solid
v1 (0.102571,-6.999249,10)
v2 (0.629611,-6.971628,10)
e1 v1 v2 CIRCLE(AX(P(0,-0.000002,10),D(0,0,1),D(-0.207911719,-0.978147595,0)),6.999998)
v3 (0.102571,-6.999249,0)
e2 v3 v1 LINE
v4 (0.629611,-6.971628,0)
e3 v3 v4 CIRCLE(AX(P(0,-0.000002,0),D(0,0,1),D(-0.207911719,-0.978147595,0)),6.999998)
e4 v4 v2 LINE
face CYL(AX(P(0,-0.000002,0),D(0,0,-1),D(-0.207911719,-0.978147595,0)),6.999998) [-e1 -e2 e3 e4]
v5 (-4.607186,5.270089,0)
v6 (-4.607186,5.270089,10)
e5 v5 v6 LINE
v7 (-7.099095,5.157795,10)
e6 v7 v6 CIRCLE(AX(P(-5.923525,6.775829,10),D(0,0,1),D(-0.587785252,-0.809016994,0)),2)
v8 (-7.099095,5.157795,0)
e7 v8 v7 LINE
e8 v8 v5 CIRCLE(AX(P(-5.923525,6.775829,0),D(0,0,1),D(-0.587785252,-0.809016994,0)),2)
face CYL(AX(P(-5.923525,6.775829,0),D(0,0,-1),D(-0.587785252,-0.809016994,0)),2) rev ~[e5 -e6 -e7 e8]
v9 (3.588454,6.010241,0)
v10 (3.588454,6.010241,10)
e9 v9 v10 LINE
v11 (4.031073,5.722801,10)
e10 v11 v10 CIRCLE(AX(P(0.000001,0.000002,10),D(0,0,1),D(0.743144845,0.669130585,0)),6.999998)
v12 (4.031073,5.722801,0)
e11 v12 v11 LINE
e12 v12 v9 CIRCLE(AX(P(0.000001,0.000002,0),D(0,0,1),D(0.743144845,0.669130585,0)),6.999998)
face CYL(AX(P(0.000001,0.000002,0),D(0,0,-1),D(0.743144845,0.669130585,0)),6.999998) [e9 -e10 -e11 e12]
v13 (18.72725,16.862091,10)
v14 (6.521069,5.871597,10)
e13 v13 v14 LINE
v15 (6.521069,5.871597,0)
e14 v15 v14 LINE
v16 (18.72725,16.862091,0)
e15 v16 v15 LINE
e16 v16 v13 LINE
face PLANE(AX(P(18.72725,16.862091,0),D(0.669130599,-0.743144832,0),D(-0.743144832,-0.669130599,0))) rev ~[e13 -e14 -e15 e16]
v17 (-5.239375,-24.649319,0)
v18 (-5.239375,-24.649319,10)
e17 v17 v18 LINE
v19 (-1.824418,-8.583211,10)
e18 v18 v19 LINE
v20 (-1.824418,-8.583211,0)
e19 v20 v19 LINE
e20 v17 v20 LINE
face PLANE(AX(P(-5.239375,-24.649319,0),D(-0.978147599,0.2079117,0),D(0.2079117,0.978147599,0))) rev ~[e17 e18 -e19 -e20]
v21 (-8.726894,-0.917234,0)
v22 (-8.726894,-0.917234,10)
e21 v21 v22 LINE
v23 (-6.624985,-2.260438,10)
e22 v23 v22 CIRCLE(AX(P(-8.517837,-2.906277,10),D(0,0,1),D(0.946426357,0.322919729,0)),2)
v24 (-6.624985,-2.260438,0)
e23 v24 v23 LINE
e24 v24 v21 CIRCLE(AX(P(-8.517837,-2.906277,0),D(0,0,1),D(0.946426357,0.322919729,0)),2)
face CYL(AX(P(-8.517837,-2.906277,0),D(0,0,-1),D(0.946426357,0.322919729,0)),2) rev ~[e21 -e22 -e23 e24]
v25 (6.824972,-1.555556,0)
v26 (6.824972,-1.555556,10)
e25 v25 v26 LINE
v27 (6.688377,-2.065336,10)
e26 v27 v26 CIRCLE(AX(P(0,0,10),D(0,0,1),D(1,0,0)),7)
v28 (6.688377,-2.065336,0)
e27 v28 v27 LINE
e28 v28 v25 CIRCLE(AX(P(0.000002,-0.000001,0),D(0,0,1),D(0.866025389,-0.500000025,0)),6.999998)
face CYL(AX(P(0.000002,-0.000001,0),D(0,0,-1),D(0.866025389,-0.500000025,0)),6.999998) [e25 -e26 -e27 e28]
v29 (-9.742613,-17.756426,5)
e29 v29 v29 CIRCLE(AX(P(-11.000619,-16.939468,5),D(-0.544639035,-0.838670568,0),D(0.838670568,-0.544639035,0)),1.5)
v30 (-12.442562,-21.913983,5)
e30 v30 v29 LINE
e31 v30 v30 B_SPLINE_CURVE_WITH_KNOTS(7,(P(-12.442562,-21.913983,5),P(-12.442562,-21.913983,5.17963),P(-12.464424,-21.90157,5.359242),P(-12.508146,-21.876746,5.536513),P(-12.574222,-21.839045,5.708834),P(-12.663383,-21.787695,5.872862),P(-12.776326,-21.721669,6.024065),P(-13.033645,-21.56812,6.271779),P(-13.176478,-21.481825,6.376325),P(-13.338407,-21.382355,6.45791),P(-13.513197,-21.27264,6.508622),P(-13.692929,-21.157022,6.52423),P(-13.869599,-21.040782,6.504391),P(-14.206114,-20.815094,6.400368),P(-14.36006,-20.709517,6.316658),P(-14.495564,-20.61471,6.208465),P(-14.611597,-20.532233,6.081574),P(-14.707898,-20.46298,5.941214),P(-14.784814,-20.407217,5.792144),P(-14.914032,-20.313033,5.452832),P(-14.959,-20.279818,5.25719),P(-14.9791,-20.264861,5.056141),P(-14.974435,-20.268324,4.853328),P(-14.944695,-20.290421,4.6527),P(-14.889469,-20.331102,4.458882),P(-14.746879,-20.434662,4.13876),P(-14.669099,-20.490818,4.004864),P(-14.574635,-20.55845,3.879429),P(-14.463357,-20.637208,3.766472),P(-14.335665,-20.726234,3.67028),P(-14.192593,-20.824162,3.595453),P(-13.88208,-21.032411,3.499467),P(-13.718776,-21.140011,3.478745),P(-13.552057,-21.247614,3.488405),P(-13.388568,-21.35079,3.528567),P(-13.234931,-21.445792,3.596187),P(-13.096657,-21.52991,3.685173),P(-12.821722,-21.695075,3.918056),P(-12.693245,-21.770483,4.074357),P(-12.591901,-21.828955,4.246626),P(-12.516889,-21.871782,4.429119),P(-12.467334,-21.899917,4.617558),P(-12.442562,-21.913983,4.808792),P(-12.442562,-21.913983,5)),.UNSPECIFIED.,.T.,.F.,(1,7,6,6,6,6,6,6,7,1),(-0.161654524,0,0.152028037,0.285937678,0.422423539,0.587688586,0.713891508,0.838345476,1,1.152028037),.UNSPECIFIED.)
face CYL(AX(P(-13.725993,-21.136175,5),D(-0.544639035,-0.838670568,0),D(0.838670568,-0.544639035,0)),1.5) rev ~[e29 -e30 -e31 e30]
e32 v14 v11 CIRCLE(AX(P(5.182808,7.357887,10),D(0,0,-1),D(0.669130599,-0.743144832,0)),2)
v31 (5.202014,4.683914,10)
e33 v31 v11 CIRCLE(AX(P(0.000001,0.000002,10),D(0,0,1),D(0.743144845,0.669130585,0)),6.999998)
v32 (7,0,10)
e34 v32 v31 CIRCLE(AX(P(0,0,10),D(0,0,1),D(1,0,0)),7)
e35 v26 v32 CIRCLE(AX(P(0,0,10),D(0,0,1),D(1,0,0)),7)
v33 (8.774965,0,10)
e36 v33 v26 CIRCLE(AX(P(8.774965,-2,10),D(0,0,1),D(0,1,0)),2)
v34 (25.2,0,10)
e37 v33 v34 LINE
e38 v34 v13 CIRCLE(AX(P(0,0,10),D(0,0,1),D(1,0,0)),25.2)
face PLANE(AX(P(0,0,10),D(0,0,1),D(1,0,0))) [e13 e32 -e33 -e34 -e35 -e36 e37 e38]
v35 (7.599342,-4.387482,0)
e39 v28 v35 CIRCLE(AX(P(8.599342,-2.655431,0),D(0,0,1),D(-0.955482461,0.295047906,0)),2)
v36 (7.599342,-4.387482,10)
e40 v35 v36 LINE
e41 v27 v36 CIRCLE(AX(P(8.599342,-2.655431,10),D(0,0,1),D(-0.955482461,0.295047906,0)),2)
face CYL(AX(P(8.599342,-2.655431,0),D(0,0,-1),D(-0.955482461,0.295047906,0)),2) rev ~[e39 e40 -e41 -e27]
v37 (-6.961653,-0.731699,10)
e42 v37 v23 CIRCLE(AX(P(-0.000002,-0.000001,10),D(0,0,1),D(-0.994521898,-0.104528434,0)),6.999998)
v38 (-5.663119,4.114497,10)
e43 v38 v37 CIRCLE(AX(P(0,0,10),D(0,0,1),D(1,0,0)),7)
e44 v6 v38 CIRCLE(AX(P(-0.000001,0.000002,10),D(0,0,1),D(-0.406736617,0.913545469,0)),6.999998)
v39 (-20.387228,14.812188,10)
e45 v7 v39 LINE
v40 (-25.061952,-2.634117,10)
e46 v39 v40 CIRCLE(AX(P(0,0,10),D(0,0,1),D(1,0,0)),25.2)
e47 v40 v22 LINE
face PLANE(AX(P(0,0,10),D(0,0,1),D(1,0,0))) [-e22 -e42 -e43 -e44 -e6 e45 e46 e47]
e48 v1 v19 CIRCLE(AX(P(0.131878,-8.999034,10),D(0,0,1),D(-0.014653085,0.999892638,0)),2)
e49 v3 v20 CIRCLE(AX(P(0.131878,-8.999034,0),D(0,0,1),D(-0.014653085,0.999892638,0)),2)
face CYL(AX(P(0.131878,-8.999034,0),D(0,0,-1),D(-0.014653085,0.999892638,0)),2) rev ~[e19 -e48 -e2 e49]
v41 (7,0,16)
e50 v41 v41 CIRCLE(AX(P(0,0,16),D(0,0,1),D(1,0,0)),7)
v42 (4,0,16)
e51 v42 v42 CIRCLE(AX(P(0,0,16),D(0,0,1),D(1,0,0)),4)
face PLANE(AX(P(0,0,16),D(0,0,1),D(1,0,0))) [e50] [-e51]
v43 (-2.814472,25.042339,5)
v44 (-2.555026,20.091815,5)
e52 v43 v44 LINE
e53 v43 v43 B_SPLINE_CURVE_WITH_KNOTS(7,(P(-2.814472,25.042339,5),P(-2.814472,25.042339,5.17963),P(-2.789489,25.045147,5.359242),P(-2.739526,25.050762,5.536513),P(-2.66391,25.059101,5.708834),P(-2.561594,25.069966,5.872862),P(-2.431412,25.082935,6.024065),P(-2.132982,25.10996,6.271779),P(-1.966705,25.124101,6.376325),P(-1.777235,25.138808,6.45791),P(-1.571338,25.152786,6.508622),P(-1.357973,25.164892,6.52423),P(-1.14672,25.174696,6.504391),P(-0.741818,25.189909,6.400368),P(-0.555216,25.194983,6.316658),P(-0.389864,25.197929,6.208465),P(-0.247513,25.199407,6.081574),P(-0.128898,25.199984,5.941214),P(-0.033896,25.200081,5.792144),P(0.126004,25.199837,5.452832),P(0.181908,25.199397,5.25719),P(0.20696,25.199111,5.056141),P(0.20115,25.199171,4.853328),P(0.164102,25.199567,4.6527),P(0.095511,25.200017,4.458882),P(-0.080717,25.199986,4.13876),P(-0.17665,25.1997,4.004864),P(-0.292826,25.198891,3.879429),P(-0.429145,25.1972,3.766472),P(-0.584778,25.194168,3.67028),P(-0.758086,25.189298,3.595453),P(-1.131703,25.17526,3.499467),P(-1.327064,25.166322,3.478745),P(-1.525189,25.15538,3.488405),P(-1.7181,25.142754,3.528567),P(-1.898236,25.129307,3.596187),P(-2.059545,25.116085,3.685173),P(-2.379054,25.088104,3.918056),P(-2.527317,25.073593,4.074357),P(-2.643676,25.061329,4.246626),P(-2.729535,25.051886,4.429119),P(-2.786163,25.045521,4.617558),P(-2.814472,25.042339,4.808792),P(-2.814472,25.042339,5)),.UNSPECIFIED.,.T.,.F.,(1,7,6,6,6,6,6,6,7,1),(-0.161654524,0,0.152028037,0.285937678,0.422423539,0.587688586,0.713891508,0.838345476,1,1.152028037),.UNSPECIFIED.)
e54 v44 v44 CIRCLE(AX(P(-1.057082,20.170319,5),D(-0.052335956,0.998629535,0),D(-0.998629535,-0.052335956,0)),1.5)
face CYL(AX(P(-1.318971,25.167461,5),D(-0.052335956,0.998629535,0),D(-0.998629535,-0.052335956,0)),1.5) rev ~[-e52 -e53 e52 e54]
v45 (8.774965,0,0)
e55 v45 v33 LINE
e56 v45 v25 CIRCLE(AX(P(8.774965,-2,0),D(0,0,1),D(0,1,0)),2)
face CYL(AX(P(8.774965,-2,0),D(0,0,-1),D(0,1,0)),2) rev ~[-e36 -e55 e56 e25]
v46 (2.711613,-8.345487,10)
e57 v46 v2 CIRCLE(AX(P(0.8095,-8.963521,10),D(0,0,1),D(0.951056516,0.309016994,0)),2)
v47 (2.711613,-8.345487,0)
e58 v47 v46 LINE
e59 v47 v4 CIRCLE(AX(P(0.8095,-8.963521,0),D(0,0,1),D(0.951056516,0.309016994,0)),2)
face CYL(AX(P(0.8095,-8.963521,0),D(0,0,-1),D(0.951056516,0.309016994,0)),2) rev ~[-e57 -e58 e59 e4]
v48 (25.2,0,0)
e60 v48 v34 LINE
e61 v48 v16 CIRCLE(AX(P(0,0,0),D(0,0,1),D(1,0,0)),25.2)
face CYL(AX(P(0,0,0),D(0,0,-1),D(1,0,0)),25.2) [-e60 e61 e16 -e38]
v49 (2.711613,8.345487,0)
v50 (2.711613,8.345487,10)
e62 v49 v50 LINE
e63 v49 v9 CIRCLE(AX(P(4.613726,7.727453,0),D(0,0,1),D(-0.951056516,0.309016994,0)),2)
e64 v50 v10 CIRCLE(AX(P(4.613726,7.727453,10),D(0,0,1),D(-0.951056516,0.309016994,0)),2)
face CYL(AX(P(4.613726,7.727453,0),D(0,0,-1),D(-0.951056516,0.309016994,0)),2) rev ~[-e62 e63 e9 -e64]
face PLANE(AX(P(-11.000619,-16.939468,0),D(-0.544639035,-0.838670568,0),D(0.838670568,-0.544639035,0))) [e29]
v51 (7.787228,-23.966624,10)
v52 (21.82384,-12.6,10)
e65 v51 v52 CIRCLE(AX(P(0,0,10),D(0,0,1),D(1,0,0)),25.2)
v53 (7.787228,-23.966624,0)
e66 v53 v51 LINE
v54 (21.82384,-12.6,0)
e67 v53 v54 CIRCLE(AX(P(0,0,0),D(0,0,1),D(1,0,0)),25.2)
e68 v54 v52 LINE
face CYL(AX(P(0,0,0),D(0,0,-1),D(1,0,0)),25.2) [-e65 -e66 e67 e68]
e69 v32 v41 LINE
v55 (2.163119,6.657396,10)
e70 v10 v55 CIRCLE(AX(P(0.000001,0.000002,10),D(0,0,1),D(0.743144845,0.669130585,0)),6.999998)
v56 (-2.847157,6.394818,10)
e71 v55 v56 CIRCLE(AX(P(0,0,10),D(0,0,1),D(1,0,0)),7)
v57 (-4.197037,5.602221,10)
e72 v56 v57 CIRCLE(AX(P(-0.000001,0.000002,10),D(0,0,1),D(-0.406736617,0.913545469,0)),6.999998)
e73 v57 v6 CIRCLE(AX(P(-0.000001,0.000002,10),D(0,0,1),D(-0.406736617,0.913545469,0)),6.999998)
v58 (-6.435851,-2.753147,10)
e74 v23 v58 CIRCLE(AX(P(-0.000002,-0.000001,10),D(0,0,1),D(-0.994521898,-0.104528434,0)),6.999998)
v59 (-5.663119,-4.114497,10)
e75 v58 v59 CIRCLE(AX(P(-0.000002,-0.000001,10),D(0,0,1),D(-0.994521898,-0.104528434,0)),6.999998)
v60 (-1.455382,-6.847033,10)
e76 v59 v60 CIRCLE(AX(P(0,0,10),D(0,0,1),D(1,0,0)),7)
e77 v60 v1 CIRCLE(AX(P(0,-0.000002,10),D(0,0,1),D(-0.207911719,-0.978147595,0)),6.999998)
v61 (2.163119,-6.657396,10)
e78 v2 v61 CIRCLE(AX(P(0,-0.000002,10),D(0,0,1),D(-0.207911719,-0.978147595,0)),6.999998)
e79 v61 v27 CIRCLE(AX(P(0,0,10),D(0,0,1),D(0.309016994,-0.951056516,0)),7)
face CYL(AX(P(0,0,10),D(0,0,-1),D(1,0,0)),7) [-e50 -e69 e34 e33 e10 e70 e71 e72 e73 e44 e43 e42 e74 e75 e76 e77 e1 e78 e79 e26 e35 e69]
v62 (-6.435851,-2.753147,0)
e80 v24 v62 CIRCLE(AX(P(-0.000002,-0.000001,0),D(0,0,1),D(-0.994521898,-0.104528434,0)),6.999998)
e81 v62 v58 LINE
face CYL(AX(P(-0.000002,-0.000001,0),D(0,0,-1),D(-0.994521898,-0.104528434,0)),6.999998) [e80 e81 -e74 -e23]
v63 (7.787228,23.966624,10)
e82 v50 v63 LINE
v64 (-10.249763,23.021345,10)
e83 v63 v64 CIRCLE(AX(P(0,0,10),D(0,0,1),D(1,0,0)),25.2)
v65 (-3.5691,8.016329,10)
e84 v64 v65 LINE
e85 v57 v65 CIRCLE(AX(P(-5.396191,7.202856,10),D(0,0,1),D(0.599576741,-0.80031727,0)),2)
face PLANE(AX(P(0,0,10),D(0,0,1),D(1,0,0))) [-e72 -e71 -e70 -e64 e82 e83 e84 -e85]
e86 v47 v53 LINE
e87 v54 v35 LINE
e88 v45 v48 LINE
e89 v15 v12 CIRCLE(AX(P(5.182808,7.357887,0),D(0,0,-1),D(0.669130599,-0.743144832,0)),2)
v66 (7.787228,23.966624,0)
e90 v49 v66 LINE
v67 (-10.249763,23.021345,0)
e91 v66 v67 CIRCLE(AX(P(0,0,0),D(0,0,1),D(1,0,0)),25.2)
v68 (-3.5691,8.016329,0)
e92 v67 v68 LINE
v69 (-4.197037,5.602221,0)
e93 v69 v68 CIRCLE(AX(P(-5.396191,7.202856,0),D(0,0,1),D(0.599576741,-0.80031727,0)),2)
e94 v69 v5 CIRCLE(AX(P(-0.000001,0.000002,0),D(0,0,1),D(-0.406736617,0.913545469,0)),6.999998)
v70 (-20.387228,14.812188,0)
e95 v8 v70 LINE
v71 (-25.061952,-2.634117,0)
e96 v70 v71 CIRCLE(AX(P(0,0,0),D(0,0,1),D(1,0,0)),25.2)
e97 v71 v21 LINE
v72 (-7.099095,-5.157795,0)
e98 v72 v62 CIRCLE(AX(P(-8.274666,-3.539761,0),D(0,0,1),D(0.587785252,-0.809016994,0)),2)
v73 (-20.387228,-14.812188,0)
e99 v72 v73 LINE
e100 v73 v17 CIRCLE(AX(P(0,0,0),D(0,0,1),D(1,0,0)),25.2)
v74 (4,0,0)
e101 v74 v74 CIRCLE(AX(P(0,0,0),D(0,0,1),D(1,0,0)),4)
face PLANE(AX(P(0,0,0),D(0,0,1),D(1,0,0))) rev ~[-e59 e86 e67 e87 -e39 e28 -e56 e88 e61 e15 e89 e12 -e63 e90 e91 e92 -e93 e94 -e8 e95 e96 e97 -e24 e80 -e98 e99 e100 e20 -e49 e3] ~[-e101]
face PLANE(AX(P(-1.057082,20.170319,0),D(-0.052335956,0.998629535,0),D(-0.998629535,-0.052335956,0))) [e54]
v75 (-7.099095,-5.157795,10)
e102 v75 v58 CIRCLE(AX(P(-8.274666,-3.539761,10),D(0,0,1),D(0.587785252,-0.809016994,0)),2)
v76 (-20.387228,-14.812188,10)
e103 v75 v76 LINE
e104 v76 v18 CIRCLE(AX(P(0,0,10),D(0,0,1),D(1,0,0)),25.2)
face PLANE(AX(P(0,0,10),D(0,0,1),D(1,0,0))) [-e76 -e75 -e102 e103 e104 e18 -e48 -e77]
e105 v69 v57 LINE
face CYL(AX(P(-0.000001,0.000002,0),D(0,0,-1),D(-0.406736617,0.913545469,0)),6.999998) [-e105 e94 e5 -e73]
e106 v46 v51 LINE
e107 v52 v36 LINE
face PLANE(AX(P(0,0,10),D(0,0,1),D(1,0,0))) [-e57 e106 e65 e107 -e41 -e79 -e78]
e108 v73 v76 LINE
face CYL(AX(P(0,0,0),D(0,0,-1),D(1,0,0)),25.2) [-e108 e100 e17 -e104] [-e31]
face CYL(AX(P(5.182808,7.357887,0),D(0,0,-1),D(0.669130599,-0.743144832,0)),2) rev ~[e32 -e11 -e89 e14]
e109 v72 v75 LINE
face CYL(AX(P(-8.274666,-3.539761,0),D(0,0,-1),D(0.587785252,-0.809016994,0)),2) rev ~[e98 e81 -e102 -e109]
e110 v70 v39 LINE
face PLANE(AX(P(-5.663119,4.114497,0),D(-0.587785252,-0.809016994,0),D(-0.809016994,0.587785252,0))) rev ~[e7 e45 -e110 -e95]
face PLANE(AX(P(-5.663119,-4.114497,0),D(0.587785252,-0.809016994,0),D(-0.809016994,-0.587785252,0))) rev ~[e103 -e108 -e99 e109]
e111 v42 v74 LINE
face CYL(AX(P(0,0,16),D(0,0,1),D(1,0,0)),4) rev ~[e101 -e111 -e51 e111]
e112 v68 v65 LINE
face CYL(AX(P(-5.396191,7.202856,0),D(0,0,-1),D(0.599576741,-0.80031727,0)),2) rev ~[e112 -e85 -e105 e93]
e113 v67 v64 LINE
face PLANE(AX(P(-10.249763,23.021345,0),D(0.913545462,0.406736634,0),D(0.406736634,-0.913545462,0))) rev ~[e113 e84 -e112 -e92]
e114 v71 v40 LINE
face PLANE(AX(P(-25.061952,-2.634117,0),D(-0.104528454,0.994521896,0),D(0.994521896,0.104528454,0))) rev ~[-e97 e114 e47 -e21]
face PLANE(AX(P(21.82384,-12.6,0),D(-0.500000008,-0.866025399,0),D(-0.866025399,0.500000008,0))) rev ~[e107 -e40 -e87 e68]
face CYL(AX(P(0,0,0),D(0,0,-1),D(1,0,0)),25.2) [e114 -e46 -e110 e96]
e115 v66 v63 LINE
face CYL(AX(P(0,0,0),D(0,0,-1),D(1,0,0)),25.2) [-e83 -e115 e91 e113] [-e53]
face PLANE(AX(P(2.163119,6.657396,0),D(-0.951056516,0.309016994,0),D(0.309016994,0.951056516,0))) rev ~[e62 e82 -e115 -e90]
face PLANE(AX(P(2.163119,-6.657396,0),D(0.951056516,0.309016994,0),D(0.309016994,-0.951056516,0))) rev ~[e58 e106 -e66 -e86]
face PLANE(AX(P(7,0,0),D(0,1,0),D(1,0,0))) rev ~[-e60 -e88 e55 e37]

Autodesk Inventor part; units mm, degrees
ref_plane "YZ Plane" through (0, 0, 0) normal (1, 0, 0) x (0, 1, 0)
ref_plane "XZ Plane" through (0, 0, 0) normal (0, 1, 0) x (-1, 0, 0)
sketch "Sketch1" plane through (0, 0, 0) normal (0, 0, 1) x (1, 0, 0)
  circle A0 centre (0, 0) radius 25.2
  dimension "d0" = 50.4
sketch "Sketch1 outline for Extrusion1" plane through (0, 0, 0) normal (0, 0, 1) x (1, 0, 0)
  circle A0 centre (0, 0) radius 25.2
extrude "Extrusion1" add sketch "Sketch1 outline for Extrusion1" along normal blind 10
sketch "Sketch2" plane through (0, 0, 10) normal (0, 0, 1) x (1, 0, 0)
  circle A0 centre (0, 0) radius 25.2 projected
  circle A1 centre (0, 0) radius 7
  dimension "d3" = 14
sketch "Sketch2 outline for Extrusion2" plane through (0, 0, 10) normal (0, 0, 1) x (1, 0, 0)
  circle A0 centre (0, 0) radius 7
extrude "Extrusion2" add sketch "Sketch2 outline for Extrusion2" along normal blind 6
sketch "Sketch4" plane through (0, 0, 16) normal (0, 0, 1) x (1, 0, 0)
  circle A0 centre (0, 0) radius 7 projected
  circle A1 centre (0, 0) radius 4
  dimension "d9" = 8
sketch "Sketch4 outline for Extrusion4" plane through (0, 0, 16) normal (0, 0, 1) x (1, 0, 0)
  circle A0 centre (0, 0) radius 4
extrude "Extrusion4" cut sketch "Sketch4 outline for Extrusion4" against normal through all
sketch "Sketch8" plane through (0, 0, 0) normal (0, 0, -1) x (-1, 0, 0)
  line L0 (0, 0) -> (-25.2, 0)
  circle A0 centre (0, 0) radius 25.2
  circle A1 centre (0, 0) radius 7
  line L1 (0, 0) -> (-21.82384, -12.6)
  point P0 (-6.062178, -3.5)
  point P1 (-7, 0)
  dimension "d23" = 30
sketch "Sketch8 outline for Extrusion8" plane through (0, 0, 0) normal (0, 0, -1) x (-1, 0, 0)
  line L0 (-21.82384, -12.6) -> (-6.062178, -3.5)
  arc A0 (-25.2, 0) -> (-21.82384, -12.6) centre (0, 0) ccw
  line L1 (-7, 0) -> (-25.2, 0)
  arc A1 (-6.062178, -3.5) -> (-7, 0) centre (0, 0) cw
extrude "Extrusion8" cut sketch "Sketch8 outline for Extrusion8" against normal blind 10
pattern_circular "Circular Pattern1" count 5 over 360 about axis through (0, 0, 16) along (0, 0, -1) of "Extrusion8"
fillet "Fillet1" radius 2 10 edges at (5.202, 4.6839, 5) (2.1631, 6.6574, 5) (-2.8472, 6.3948, 5) (-5.6631, 4.1145, 5) (-6.9617, -0.7317, 5) (-5.6631, -4.1145, 5) (-1.4554, -6.847, 5) (2.1631, -6.6574, 5) (7, 0, 5) (6.0622, -3.5, 5)
ref_plane "Work Plane1" through (-1.318866, 25.165464, 0) normal (-0.052336, 0.9986295, 0) x (-0.9986295, -0.052336, 0)
sketch "Sketch9" plane through (-1.318866, 25.165464, 0) normal (-0.052336, 0.9986295, 0) x (-0.9986295, -0.052336, 0)
  circle A0 centre (0, 5) radius 1.5
  point P0 (0, 0)
  dimension "d30" = 3
  dimension "d31" = 5
sketch "Sketch9 outline for Extrusion9" plane through (-1.318866, 25.165464, 0) normal (-0.052336, 0.9986295, 0) x (-0.9986295, -0.052336, 0)
  circle A0 centre (0, 5) radius 1.5
extrude "Extrusion9" cut sketch "Sketch9 outline for Extrusion9" against normal blind 5
pattern_circular "Circular Pattern2" count 2 over 144 about axis through (0, 0, 16) along (0, 0, 1) of "Extrusion9"
properties part number "1313_Drive Coil End_V1" material "ABS Plastic"
